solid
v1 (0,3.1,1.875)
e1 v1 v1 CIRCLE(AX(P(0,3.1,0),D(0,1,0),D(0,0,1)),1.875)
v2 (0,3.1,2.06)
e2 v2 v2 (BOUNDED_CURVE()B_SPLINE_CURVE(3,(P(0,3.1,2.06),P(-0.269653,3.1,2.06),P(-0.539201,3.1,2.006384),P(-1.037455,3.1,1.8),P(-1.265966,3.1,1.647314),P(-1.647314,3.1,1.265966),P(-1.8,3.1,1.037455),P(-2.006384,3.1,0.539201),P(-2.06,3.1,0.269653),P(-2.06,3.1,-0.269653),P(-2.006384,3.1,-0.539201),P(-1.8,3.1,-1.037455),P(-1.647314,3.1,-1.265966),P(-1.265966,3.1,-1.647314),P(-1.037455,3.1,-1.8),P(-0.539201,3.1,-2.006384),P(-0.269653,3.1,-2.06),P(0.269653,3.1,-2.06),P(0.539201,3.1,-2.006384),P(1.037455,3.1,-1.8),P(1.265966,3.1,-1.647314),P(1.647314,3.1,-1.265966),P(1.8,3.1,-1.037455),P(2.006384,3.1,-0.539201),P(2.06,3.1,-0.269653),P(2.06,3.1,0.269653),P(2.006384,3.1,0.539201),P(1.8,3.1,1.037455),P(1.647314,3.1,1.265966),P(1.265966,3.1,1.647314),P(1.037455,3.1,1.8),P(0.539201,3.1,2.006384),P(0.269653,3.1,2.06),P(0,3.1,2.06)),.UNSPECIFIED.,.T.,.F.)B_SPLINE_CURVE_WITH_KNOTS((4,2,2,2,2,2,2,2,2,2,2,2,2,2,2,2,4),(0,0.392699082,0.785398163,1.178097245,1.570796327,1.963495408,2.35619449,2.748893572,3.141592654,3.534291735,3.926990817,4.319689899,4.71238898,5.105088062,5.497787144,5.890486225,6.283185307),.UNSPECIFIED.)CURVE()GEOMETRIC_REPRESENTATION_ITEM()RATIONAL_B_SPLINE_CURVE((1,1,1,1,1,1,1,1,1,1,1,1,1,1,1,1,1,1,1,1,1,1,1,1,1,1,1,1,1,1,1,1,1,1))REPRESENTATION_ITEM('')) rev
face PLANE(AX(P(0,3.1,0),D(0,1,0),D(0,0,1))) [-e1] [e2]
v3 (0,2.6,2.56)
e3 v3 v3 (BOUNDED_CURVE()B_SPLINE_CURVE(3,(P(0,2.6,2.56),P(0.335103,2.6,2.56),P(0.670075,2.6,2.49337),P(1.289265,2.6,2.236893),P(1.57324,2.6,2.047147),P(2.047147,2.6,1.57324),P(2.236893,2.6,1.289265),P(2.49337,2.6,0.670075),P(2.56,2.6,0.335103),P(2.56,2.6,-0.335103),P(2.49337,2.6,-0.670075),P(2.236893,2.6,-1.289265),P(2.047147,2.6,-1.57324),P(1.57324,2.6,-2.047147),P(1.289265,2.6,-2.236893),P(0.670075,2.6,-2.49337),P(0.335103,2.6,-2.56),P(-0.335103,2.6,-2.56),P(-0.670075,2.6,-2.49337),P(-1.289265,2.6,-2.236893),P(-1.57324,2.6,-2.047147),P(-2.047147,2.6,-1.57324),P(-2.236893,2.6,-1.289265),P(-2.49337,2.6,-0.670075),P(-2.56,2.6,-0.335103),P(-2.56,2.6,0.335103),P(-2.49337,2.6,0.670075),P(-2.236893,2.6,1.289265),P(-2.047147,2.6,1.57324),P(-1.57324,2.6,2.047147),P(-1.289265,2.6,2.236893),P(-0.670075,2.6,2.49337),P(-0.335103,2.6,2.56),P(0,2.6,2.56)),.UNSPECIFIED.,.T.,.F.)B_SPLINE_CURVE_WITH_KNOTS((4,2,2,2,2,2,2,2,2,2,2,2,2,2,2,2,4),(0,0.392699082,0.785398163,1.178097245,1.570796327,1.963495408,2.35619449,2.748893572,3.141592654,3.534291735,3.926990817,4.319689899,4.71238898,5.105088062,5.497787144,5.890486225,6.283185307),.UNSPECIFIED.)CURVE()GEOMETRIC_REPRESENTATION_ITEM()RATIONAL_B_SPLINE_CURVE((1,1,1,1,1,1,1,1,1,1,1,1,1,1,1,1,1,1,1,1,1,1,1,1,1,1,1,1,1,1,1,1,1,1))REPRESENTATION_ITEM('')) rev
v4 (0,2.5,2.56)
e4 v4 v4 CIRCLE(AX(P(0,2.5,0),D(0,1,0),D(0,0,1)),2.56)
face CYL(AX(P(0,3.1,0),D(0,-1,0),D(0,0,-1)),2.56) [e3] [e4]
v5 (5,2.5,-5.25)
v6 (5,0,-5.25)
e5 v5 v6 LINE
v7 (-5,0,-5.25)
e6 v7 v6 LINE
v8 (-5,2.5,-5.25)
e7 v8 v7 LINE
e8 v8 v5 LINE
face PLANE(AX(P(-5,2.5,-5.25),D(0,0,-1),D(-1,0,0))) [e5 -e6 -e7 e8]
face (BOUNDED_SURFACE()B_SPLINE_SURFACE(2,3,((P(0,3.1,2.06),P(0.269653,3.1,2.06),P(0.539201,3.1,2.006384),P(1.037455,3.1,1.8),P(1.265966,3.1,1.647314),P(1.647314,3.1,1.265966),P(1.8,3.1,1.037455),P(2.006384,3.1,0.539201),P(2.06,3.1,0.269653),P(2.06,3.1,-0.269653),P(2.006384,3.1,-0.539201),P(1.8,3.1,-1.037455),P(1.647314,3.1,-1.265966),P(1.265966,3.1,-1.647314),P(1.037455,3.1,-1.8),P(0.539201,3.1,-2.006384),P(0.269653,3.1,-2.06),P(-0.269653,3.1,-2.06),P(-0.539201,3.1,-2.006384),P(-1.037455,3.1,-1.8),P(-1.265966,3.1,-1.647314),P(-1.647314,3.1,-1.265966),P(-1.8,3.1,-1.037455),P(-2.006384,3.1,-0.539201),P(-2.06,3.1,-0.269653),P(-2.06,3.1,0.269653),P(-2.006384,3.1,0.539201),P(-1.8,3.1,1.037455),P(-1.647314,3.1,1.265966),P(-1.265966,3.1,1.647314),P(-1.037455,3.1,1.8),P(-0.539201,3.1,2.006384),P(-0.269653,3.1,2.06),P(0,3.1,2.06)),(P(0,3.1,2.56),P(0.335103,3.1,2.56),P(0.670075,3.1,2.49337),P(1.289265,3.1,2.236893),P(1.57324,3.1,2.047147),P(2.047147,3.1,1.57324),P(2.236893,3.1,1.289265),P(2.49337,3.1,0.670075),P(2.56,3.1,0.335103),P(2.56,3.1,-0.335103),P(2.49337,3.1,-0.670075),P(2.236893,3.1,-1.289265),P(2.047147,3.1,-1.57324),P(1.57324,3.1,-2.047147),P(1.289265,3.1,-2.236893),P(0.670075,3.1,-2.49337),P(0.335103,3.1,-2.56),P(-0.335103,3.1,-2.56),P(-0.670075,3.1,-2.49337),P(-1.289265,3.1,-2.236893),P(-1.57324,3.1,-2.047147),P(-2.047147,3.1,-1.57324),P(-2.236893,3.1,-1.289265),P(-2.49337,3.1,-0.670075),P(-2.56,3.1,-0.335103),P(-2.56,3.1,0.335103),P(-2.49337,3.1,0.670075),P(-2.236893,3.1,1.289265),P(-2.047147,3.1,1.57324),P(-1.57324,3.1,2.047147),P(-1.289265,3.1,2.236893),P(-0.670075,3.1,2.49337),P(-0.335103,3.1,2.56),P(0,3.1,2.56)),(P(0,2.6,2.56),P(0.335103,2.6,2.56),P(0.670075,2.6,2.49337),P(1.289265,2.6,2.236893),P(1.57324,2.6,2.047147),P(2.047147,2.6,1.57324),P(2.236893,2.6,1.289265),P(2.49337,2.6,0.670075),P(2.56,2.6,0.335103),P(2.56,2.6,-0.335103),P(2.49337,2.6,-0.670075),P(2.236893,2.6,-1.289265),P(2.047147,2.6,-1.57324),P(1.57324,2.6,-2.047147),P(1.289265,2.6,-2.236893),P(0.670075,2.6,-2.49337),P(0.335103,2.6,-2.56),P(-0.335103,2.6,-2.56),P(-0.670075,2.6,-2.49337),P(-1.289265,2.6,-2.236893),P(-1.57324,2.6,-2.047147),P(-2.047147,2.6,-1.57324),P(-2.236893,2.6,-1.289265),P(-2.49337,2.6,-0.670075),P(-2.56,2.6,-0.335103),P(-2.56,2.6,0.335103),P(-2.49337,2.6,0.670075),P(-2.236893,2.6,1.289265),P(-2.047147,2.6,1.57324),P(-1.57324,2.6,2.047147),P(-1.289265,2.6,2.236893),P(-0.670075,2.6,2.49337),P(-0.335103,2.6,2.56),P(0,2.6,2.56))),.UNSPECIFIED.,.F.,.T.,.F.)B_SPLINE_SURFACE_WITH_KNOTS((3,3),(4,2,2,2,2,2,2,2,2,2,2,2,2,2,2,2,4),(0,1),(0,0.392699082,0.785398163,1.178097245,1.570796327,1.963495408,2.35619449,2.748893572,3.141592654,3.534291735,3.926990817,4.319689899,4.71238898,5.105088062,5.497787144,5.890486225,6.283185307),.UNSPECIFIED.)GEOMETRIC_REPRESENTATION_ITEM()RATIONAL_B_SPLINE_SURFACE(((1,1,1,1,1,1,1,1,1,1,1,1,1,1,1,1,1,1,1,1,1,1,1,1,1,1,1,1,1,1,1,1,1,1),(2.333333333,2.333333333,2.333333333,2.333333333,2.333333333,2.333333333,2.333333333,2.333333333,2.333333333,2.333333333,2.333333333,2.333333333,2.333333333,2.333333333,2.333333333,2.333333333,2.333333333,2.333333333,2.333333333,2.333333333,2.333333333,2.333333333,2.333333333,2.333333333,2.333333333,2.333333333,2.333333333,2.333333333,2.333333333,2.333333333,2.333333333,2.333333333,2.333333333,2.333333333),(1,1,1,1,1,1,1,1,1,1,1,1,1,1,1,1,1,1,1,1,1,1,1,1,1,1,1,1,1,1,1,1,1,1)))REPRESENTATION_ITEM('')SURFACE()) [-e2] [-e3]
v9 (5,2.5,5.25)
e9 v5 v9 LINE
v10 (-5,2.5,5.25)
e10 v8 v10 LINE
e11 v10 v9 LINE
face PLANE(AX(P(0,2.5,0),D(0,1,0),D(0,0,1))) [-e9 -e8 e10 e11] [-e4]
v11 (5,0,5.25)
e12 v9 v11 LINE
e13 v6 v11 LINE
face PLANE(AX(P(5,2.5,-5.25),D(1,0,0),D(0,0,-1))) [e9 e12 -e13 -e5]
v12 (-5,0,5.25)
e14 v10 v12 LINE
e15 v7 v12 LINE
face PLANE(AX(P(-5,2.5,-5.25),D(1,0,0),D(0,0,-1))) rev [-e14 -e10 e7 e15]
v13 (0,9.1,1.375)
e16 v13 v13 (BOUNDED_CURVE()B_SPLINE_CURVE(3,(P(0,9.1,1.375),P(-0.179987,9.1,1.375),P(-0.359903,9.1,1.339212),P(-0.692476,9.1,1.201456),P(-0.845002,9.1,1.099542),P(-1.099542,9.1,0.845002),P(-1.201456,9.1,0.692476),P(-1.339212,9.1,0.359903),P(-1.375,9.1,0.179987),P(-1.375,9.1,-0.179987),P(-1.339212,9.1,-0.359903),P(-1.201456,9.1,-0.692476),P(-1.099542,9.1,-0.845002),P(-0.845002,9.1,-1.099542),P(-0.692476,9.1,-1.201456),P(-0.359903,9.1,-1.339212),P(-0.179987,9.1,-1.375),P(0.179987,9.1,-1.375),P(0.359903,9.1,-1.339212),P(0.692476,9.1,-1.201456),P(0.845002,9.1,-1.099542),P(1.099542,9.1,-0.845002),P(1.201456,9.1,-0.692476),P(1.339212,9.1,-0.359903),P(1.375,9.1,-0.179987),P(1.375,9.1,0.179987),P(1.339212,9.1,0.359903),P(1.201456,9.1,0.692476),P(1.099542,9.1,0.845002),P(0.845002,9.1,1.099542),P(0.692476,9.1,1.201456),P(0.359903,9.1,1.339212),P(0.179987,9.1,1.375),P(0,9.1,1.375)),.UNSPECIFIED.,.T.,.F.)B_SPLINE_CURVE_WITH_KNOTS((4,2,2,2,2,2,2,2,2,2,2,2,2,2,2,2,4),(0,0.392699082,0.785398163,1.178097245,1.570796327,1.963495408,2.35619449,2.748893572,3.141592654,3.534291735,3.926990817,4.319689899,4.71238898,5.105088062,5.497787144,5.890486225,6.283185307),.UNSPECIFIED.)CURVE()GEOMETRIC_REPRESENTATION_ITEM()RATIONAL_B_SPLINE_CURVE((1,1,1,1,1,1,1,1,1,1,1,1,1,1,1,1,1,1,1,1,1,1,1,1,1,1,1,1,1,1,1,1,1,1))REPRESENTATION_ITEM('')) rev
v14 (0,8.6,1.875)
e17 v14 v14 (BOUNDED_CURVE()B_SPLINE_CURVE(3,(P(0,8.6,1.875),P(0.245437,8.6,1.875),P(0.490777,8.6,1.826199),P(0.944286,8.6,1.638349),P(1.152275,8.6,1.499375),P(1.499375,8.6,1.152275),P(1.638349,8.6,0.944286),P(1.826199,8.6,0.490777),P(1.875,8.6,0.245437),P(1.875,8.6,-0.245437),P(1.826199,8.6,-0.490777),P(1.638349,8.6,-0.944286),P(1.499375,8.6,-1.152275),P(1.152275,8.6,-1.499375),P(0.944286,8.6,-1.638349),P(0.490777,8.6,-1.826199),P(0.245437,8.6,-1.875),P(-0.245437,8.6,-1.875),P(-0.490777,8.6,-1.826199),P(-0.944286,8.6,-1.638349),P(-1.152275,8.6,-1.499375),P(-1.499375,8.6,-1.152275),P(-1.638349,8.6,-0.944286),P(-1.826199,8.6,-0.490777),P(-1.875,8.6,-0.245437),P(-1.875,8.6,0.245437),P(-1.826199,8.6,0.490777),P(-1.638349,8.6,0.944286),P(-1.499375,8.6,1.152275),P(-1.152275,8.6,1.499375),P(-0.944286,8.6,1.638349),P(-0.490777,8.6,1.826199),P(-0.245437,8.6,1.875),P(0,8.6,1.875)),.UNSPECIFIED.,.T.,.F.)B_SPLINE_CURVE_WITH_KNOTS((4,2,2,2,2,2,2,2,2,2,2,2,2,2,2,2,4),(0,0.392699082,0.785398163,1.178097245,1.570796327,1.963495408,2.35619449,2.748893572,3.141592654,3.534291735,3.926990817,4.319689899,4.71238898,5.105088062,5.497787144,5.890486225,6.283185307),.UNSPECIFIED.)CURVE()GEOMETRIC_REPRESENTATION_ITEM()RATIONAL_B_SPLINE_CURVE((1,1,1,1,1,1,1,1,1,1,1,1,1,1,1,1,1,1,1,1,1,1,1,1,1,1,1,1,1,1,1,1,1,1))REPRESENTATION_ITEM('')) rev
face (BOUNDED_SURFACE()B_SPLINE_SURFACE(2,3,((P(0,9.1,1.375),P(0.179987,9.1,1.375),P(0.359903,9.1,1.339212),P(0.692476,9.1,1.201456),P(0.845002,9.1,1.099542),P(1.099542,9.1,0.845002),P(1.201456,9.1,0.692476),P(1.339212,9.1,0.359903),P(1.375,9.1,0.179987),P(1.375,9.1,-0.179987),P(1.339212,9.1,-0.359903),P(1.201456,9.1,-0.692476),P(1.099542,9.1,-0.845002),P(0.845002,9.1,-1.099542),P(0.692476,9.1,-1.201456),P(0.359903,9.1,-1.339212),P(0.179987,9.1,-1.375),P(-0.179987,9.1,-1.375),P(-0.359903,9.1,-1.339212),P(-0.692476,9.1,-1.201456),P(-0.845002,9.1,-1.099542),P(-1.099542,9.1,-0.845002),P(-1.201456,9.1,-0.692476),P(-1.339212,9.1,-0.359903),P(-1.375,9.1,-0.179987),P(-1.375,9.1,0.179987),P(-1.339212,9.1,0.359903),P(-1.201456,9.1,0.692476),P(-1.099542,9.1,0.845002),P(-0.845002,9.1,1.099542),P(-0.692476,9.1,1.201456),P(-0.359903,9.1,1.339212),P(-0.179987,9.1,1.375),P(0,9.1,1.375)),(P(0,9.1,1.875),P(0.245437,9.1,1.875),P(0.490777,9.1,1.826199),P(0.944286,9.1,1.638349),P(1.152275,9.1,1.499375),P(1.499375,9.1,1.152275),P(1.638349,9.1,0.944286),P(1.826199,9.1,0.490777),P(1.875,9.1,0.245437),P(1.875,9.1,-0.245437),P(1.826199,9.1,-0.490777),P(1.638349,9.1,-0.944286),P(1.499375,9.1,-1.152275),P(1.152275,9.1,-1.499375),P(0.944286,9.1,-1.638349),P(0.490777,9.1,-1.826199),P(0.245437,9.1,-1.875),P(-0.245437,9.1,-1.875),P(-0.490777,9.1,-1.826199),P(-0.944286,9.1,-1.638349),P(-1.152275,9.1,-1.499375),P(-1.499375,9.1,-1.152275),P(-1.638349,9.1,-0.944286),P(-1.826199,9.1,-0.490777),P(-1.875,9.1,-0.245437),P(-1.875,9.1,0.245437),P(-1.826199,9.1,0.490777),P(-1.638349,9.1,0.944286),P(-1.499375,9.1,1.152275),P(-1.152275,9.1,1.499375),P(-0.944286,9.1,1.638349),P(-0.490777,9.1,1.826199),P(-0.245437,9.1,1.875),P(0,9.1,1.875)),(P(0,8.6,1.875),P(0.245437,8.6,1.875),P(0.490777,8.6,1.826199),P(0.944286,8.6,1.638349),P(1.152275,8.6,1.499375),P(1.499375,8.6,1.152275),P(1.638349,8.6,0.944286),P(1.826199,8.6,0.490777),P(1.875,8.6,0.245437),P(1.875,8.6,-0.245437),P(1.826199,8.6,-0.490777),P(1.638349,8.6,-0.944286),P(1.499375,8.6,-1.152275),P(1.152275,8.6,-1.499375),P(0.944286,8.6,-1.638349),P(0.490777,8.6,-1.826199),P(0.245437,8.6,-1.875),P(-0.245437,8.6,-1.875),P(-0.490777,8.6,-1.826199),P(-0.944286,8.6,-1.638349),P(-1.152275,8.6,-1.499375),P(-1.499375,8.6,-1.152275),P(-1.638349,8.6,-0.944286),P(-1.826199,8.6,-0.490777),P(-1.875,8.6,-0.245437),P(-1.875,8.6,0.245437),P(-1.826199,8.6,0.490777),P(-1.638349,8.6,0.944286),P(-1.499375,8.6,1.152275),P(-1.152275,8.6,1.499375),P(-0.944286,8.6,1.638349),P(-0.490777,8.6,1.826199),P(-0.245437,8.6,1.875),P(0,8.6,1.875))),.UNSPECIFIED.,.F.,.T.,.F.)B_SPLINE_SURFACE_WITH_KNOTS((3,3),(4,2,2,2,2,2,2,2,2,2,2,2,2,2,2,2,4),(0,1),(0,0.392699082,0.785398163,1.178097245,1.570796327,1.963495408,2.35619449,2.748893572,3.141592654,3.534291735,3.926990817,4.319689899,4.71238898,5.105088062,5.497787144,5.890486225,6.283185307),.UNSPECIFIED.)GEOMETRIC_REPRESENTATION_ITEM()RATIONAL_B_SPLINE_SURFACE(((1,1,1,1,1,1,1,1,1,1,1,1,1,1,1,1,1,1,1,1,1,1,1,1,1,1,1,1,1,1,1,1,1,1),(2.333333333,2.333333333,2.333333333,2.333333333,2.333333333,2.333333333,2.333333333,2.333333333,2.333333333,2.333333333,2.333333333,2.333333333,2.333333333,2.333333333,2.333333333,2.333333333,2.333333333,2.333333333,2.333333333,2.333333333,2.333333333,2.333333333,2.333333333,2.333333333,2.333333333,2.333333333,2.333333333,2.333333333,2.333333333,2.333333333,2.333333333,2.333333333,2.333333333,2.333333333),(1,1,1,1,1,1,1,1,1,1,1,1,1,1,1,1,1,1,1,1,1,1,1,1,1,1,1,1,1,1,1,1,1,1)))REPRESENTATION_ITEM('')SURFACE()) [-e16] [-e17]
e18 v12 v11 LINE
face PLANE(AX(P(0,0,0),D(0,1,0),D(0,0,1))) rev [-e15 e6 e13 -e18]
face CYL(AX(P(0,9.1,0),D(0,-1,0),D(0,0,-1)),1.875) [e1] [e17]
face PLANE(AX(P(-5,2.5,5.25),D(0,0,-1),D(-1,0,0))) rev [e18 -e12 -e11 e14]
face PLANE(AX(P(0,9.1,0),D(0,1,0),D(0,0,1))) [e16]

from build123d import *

# Parameters (mm, degrees)
SKETCH_2_W      = 10
SKETCH_2_H      = 10.5
EXTRUDE_1_DEPTH = 2.5
SKETCH_3_R      = 2.56
EXTRUDE_2_DEPTH = 0.6
FILLET_1_SIZE   = 0.5
SKETCH_4_R      = 1.875
EXTRUDE_3_DEPTH = 6
FILLET_2_SIZE   = 0.5


with BuildPart() as part:
    # Эскиз2 → Бобышка-Вытянуть1 (new body)
    with BuildSketch(Plane(origin=(0, 0, 0), x_dir=(1, 0, 0), z_dir=(0, 1, 0))):
        Rectangle(SKETCH_2_W, SKETCH_2_H)
    extrude(amount=EXTRUDE_1_DEPTH)

    # Эскиз3 → Бобышка-Вытянуть2 (add)
    with BuildSketch(Plane(origin=(0, 2.5, 0), x_dir=(1, 0, 0), z_dir=(0, 1, 0))):
        with Locations(Location((0, 0, 0), (0, 0, 270))):
            Circle(SKETCH_3_R)
    extrude(amount=EXTRUDE_2_DEPTH)

    # Скругление1
    # a fillet whose section is not a circle: 0.5 mm, written as the material it takes off along each edge
    with BuildSketch(Plane(origin=(0, 3.1, 0), x_dir=(0, 0, 1), z_dir=(-1, 0, 0))) as fillet_1_piece_1:
        with BuildLine():
            Bezier((2.56, -FILLET_1_SIZE), (2.56, 0), (2.56 - FILLET_1_SIZE, 0), weights=[1, 2.333333333, 1])
            Line((2.56 - FILLET_1_SIZE, 0), (2.56, 0))
            Line((2.56, 0), (2.56, -FILLET_1_SIZE))
        make_face()
    revolve(axis=Axis((0, 3.1, 0), (0, 1, 0)), mode=Mode.SUBTRACT)

    # Эскиз4 → Бобышка-Вытянуть3 (add)
    with BuildSketch(Plane(origin=(0, 3.1, 0), x_dir=(1, 0, 0), z_dir=(0, 1, 0))):
        with Locations(Location((0, 0, 0), (0, 0, 270))):
            Circle(SKETCH_4_R)
    extrude(amount=EXTRUDE_3_DEPTH)

    # Скругление2
    # a fillet whose section is not a circle: 0.5 mm, written as the material it takes off along each edge
    with BuildSketch(Plane(origin=(0, 9.1, 0), x_dir=(0, 0, 1), z_dir=(-1, 0, 0))) as fillet_2_piece_1:
        with BuildLine():
            Bezier((1.875, -FILLET_2_SIZE), (1.875, 0), (1.875 - FILLET_2_SIZE, 0), weights=[1, 2.333333333, 1])
            Line((1.875 - FILLET_2_SIZE, 0), (1.875, 0))
            Line((1.875, 0), (1.875, -FILLET_2_SIZE))
        make_face()
    revolve(axis=Axis((0, 9.1, 0), (0, 1, 0)), mode=Mode.SUBTRACT)


solid = part.part
